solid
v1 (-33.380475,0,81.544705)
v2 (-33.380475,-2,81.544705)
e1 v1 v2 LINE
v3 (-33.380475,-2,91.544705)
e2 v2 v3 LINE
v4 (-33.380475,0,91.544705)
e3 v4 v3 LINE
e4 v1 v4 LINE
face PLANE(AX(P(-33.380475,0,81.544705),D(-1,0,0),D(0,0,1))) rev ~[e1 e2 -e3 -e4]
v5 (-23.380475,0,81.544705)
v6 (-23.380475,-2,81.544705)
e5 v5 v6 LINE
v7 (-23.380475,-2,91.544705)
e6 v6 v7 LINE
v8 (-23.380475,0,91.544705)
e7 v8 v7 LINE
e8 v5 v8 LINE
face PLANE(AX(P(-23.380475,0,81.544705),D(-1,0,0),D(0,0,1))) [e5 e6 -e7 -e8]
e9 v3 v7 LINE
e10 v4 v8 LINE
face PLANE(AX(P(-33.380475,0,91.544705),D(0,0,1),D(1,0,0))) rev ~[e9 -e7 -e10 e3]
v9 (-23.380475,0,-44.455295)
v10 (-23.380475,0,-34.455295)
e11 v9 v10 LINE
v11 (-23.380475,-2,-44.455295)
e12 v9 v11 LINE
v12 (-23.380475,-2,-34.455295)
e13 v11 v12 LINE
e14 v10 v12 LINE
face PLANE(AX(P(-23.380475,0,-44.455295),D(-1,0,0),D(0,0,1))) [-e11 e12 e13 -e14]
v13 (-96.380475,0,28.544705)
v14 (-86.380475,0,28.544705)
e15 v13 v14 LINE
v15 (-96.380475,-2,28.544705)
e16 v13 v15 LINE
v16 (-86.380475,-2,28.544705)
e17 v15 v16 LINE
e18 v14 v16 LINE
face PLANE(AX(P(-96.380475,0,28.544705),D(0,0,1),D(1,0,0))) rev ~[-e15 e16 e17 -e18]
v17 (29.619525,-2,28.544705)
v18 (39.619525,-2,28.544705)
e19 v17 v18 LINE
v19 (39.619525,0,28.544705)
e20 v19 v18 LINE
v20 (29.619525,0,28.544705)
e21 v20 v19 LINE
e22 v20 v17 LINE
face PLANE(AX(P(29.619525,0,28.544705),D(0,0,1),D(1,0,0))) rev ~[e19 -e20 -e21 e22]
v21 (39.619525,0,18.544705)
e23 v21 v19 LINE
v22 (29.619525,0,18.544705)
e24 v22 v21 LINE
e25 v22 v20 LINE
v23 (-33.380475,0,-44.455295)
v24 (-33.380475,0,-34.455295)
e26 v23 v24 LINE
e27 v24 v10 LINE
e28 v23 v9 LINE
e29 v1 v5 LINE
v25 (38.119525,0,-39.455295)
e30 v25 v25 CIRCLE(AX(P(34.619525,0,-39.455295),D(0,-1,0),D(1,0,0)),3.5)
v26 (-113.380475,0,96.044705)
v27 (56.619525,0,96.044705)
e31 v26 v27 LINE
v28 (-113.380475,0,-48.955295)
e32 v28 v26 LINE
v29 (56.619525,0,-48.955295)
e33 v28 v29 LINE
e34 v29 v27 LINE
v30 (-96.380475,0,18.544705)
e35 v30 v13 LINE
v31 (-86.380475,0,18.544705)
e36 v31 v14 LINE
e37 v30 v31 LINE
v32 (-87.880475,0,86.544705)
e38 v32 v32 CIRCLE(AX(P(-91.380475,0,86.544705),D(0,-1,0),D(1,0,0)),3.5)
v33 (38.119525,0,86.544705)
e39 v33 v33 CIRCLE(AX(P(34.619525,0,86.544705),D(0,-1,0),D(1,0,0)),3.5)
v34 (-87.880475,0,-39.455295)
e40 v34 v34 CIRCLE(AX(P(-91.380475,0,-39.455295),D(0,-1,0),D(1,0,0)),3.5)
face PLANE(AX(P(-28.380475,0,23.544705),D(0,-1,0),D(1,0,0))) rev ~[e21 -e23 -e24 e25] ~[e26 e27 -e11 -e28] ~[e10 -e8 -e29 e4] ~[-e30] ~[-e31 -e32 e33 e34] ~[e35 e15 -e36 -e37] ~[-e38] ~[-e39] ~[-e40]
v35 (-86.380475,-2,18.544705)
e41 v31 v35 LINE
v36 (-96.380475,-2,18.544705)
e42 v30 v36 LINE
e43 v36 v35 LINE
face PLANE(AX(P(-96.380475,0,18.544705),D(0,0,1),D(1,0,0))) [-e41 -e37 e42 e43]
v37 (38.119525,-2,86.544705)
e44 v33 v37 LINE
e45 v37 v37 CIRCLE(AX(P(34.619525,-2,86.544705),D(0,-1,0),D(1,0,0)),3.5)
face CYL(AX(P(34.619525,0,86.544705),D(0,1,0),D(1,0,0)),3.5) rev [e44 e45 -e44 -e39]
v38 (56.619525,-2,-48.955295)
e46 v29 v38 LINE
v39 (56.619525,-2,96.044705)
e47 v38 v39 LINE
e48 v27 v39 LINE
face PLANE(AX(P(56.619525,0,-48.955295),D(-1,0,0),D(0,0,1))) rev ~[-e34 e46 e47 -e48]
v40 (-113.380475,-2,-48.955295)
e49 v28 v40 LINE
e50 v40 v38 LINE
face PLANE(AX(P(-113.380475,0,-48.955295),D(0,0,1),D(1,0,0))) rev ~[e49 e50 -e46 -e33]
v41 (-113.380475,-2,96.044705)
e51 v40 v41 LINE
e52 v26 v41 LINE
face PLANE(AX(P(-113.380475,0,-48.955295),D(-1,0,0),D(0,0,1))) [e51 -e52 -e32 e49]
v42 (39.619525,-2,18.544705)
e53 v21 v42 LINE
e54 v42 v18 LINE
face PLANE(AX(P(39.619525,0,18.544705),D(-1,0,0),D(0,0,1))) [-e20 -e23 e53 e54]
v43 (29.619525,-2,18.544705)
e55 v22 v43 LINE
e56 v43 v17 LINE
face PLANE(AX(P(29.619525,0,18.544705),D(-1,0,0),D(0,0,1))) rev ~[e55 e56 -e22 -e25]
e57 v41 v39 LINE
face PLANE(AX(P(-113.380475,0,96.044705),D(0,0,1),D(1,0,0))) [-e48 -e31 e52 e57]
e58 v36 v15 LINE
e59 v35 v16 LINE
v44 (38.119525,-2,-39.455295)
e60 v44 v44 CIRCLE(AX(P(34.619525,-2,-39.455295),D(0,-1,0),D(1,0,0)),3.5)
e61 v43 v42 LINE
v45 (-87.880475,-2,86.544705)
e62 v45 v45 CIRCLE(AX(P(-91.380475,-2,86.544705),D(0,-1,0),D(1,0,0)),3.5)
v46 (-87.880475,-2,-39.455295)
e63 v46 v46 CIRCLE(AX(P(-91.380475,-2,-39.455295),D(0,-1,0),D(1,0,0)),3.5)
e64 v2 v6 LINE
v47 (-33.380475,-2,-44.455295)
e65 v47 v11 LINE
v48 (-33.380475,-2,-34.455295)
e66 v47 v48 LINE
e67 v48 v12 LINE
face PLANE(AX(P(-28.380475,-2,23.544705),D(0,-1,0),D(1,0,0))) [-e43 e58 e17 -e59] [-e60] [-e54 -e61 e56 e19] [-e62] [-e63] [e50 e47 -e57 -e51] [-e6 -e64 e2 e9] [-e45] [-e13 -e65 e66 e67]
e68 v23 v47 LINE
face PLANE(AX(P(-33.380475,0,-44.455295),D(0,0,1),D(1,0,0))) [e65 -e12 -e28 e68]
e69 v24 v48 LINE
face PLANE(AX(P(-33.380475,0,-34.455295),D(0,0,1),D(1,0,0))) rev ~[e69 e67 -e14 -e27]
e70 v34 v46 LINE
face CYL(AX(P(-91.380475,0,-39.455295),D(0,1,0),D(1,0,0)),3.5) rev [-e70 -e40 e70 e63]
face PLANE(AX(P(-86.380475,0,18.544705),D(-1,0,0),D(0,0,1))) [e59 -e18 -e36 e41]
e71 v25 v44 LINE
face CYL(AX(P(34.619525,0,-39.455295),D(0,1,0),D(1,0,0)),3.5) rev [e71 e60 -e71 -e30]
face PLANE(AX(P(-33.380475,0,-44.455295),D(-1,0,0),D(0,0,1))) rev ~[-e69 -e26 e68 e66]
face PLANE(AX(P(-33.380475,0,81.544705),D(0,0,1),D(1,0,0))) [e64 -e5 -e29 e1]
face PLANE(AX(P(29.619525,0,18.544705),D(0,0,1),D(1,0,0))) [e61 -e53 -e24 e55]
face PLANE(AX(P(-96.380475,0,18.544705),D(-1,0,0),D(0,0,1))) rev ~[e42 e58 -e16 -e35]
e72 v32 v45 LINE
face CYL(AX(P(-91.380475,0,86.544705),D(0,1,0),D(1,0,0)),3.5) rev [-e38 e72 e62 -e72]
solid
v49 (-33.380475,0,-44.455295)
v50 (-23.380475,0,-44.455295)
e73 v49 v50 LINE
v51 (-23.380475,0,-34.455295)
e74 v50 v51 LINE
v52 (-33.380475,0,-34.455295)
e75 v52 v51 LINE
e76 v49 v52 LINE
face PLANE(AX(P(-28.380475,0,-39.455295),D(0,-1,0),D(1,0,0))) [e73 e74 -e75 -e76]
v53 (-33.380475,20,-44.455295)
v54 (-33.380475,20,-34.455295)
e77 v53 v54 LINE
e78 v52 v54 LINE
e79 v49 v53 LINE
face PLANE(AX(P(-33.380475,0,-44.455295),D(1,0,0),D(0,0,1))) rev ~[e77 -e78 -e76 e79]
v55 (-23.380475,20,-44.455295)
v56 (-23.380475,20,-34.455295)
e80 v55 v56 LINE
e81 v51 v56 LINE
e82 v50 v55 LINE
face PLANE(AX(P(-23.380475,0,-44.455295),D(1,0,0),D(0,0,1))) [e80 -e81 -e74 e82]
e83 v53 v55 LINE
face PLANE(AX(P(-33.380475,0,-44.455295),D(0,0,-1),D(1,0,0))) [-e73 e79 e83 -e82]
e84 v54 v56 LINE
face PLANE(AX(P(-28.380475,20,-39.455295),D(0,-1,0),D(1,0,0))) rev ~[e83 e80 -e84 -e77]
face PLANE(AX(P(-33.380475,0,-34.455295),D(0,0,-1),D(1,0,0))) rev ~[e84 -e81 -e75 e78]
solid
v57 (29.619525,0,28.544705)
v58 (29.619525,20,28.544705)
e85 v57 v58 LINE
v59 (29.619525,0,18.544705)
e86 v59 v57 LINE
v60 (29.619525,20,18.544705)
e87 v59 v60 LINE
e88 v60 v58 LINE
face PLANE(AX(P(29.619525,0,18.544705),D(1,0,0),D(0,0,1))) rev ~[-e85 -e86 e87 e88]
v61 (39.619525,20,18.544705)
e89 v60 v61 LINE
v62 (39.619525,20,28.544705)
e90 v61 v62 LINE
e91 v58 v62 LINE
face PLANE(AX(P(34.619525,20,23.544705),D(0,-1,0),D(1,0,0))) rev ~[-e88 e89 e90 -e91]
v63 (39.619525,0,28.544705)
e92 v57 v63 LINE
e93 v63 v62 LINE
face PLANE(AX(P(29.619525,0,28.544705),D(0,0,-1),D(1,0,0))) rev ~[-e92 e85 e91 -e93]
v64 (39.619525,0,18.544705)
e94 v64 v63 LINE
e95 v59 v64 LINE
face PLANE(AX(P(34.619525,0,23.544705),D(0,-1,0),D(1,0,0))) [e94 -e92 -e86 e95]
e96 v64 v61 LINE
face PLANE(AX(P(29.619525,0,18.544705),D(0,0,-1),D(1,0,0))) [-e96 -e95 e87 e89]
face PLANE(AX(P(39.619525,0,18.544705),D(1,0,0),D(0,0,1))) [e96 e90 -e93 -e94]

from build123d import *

# Parameters (mm, degrees)
F0_W     = 10
F0_H     = 10
F7_DEPTH = 20
F8_DEPTH = 20
F0_W_2   = 170
F0_H_2   = 145
F0_R     = 3.5
F9_DEPTH = 2


# Not quite as in the source:
# - the program builds the solid bodies; features that only make, move or delete a surface that nothing else refers to are left out


with BuildPart() as f7:
    # F0 (on Front) → F7 (new body)
    with BuildSketch(Plane.XZ):
        with Locations((34.6195249557, 23.5447047651)):
            Rectangle(F0_W, F0_H)
    extrude(amount=-F7_DEPTH)


with BuildPart() as f8:
    # F0 (on Front) → F8 (new body)
    with BuildSketch(Plane.XZ):
        with Locations((-28.3804750443, -39.4552952349)):
            Rectangle(F0_W, F0_H)
    extrude(amount=-F8_DEPTH)


with BuildPart() as f9:
    # F0 (on Front) → F9 (new body)
    with BuildSketch(Plane.XZ):
        with Locations((-28.3804750443, 23.5447047651)):
            Rectangle(F0_W_2, F0_H_2)
        with Locations((-91.3804750443, -39.4552952349)):
            Circle(F0_R, mode=Mode.SUBTRACT)
        with Locations((-28.3804750443, -39.4552952349)):
            Rectangle(F0_W, F0_H, mode=Mode.SUBTRACT)
        with Locations((34.6195249557, -39.4552952349)):
            Circle(F0_R, mode=Mode.SUBTRACT)
        with Locations((-91.3804750443, 23.5447047651)):
            Rectangle(F0_W, F0_H, mode=Mode.SUBTRACT)
        with Locations((-91.3804750443, 86.5447047651)):
            Circle(F0_R, mode=Mode.SUBTRACT)
        with Locations((34.6195249557, 23.5447047651)):
            Rectangle(F0_W, F0_H, mode=Mode.SUBTRACT)
        with Locations((-28.3804750443, 86.5447047651)):
            Rectangle(F0_W, F0_H, mode=Mode.SUBTRACT)
        with Locations((34.6195249557, 86.5447047651)):
            Circle(F0_R, mode=Mode.SUBTRACT)
    extrude(amount=F9_DEPTH)


solid = Compound([f7.part, f8.part, f9.part])
